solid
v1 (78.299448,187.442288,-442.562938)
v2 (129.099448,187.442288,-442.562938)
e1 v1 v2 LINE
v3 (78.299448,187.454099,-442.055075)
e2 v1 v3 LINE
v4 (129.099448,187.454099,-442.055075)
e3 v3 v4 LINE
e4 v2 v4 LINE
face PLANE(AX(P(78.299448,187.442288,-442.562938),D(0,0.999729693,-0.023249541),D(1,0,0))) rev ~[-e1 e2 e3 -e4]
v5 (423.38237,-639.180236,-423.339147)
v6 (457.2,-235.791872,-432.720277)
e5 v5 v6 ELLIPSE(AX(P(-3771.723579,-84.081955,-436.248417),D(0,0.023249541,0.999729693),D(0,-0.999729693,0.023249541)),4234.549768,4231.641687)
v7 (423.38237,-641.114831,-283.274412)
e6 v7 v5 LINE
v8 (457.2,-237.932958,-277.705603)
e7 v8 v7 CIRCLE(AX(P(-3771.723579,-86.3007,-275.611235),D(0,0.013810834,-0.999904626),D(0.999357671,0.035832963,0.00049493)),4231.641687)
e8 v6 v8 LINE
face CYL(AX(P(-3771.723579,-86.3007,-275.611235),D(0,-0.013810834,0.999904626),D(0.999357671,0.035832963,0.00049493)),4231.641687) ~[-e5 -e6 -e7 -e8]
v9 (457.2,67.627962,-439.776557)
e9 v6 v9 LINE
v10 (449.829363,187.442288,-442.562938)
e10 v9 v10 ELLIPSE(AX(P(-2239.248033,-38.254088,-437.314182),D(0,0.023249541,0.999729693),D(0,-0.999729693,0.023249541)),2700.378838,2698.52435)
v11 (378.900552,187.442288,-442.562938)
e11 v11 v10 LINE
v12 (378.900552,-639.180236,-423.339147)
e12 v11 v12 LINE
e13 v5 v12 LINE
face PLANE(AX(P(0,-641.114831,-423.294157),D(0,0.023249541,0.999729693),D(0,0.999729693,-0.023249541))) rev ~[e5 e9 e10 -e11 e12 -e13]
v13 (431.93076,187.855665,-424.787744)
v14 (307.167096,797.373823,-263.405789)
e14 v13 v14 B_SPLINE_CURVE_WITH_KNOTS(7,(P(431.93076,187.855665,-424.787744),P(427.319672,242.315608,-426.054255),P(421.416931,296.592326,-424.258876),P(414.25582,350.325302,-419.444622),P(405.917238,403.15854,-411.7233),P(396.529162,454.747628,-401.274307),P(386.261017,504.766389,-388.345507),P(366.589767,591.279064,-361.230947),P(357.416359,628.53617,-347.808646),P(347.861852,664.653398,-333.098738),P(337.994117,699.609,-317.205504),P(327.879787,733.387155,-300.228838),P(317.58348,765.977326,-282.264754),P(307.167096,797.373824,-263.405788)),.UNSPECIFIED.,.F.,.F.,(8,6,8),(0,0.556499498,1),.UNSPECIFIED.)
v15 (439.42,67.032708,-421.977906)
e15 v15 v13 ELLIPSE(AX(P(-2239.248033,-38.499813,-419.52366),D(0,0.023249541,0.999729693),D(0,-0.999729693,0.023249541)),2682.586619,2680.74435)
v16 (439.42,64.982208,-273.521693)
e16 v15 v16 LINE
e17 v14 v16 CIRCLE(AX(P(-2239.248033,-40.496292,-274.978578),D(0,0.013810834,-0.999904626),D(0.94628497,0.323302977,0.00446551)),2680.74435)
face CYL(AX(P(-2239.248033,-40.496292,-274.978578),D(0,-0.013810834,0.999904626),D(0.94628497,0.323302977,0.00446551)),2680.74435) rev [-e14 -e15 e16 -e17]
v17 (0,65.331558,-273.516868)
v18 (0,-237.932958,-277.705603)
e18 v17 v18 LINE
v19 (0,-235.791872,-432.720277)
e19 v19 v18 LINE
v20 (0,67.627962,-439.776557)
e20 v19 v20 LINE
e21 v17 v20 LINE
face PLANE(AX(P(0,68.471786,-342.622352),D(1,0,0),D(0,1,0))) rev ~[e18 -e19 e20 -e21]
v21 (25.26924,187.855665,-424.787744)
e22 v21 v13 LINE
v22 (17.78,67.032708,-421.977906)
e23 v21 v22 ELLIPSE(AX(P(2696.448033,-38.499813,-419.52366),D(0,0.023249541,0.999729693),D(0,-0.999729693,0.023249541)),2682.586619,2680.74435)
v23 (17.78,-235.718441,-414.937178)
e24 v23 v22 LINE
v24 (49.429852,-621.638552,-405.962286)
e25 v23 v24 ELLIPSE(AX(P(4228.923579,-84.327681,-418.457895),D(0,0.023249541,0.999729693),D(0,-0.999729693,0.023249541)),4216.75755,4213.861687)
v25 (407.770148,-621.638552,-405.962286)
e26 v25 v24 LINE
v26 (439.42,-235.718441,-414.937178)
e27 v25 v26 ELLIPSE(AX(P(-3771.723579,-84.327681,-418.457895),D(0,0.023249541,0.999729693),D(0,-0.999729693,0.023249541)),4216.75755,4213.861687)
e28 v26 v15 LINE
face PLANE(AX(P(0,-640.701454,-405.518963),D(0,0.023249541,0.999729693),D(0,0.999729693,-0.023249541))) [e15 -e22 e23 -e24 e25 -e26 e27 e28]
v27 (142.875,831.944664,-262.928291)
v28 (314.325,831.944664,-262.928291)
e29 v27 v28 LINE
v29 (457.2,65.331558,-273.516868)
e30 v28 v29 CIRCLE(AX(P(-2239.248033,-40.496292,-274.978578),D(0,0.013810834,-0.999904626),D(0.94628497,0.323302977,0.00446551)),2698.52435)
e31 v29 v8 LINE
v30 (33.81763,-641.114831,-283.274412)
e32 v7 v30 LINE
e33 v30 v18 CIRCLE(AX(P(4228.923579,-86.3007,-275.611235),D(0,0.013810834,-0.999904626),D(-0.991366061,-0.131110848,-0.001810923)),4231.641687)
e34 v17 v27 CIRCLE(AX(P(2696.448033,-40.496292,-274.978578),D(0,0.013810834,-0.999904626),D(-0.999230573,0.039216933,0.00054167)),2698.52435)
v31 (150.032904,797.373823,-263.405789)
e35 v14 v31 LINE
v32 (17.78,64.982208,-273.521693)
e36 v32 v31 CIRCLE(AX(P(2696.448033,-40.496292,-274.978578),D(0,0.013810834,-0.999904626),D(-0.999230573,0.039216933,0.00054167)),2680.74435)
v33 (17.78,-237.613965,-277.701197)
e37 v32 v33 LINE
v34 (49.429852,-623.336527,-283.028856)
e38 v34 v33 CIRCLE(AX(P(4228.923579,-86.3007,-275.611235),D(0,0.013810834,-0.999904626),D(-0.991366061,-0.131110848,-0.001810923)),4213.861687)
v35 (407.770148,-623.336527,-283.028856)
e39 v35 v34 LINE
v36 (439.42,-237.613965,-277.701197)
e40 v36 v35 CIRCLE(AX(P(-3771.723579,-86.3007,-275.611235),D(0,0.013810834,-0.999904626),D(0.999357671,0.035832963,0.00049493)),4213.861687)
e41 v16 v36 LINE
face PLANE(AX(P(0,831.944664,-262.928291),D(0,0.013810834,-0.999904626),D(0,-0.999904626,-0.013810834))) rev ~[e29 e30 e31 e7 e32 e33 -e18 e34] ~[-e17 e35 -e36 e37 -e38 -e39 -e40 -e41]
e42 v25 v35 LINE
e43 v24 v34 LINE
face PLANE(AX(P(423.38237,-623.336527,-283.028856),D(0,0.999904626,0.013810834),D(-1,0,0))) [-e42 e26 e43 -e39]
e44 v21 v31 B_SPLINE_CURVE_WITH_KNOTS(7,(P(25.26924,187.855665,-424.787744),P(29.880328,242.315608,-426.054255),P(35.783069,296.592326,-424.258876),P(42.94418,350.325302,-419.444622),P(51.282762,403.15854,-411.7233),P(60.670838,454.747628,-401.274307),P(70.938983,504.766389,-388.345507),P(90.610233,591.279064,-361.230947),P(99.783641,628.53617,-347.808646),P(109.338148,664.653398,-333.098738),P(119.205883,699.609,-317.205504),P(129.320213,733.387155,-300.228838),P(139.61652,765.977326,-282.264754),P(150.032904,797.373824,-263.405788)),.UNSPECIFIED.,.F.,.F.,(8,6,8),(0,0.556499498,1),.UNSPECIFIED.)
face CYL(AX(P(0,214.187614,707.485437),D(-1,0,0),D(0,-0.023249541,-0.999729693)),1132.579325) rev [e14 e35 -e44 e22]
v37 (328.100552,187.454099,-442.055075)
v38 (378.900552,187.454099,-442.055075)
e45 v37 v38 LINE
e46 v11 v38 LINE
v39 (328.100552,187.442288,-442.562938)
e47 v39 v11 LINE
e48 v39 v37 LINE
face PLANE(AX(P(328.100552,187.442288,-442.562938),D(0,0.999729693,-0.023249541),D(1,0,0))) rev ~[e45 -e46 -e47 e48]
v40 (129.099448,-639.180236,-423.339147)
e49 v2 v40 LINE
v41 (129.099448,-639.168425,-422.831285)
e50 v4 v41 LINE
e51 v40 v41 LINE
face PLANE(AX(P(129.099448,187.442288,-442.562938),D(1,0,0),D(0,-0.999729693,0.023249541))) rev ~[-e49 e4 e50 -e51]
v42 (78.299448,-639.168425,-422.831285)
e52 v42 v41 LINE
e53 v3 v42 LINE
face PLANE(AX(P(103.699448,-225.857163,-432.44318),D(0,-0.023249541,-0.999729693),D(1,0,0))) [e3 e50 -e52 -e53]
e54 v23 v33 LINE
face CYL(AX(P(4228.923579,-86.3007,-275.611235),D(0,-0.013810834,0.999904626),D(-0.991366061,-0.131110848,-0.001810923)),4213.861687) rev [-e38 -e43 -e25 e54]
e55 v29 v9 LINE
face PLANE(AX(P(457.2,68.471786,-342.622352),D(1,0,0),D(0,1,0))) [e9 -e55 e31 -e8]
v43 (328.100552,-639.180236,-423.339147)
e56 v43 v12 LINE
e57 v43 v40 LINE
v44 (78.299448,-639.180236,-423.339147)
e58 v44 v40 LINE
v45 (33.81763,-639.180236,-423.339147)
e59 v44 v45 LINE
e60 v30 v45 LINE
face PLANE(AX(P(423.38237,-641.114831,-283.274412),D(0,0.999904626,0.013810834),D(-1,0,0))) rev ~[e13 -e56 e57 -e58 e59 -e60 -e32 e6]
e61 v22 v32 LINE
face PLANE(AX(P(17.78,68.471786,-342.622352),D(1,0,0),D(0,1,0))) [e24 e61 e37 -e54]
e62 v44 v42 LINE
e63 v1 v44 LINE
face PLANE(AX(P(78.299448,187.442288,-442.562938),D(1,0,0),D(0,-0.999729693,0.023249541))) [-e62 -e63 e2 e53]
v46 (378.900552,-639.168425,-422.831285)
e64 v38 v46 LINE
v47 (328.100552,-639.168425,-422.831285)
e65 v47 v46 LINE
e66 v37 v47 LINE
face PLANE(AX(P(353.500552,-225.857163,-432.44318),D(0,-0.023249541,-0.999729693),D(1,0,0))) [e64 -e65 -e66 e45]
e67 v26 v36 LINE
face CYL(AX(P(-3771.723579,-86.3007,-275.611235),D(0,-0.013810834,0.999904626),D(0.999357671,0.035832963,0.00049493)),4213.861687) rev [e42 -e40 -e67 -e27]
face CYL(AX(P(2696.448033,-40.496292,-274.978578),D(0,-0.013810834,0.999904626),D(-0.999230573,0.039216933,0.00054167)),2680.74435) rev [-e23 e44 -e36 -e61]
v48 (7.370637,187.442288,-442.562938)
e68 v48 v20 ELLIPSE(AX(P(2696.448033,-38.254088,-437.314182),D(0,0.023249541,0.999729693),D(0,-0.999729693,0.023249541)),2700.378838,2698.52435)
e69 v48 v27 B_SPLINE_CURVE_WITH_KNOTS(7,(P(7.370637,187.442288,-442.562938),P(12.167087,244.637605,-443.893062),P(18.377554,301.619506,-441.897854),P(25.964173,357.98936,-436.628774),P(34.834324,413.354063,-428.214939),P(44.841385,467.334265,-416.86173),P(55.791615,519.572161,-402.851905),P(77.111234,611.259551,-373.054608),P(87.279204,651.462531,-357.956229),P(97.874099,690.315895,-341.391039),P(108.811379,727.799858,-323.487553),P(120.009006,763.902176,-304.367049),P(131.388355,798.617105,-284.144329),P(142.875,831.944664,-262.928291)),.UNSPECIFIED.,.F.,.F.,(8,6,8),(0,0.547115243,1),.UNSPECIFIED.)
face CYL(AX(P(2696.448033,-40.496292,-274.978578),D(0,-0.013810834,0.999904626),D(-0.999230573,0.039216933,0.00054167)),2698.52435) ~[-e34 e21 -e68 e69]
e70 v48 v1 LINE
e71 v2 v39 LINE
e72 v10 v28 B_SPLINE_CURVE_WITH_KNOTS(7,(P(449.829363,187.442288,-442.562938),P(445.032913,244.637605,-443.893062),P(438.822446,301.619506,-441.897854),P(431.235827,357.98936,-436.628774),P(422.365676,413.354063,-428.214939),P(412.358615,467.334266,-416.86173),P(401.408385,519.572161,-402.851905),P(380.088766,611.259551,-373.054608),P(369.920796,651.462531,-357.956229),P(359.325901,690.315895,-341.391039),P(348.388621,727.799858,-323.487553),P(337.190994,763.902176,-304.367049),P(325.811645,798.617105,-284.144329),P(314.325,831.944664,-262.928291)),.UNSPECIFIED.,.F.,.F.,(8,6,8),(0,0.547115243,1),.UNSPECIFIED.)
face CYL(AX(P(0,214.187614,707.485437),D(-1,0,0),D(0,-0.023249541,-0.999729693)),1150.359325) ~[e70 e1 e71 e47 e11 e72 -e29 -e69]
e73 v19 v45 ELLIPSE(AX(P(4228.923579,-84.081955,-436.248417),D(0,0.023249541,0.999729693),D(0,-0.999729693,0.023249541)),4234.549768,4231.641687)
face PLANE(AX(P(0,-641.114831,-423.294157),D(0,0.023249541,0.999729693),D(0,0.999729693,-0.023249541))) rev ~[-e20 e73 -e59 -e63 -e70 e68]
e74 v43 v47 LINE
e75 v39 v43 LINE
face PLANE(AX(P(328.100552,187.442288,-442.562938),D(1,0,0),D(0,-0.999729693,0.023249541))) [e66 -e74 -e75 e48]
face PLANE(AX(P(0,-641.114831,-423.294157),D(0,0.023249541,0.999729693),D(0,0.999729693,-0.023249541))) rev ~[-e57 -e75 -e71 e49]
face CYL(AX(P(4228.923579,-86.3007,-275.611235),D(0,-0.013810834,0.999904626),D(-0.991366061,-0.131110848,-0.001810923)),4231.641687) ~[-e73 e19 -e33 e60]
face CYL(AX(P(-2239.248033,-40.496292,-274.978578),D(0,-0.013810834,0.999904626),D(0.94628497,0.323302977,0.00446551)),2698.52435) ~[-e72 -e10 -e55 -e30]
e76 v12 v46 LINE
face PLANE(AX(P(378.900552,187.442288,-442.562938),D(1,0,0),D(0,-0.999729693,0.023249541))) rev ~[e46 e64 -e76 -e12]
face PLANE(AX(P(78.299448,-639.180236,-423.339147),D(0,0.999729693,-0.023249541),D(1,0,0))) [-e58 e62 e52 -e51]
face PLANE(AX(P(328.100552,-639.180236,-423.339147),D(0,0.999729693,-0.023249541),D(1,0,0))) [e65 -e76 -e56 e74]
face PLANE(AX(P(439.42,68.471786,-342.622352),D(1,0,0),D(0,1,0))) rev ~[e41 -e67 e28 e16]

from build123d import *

# Parameters (mm, degrees)
F1_DEPTH = 457.2
F3_DEPTH = 254
F4_T     = 17.78
F5_W     = 50.8
F5_H     = 826.8460257717
F6_DEPTH = 0.508


# Not quite as in the source:
# - a shell that OpenCascade refuses in one call is made with other operations: the cavity is built on its own and cut out


with BuildPart() as f1:
    # F0 (on Right) → F1 (new body)
    with BuildSketch(Plane.YZ):
        with BuildLine():
            Line((288.924485445, -270.4285681248), (-641.1148309708, -283.2744121552))
            Line((-641.1148309708, -283.2744121552), (-641.1148309708, -423.2941567898))
            Line((-641.1148309708, -423.2941567898), (187.4422878027, -442.5629377365))
            ThreePointArc((187.4422878027, -442.5629377365), (523.0417315747, -400.6371692989), (831.9446638759, -262.9282910995))
            Line((831.9446638759, -262.9282910995), (288.924485445, -270.4285681248))
        make_face()
    extrude(amount=F1_DEPTH)

    # F2 (on face) → F3 (cut)
    with BuildSketch(Plane(origin=(0, 3.7895971393, -274.3668944279), x_dir=(1, 0, 0), z_dir=(0, -0.0138108343, 0.9999046259))):
        with BuildLine():
            Line((423.3823697388, -644.965941169), (615.9012913704, -644.965941169))
            Line((615.9012913704, -644.965941169), (483.5176634908, 828.234058831))
            Line((483.5176634908, 828.234058831), (457.2, 61.5478307009))
            ThreePointArc((457.2, 61.5478307009), (455.0788529219, -292.4168742611), (423.3823697388, -644.965941169))
        make_face()
        with BuildLine():
            ThreePointArc((0, 61.5478307009), (43.5944295305, 450.079610673), (142.875, 828.234058831))
            Line((142.875, 828.234058831), (0, 828.234058831))
            Line((0, 828.234058831), (-26.3176634908, 828.234058831))
            Line((-26.3176634908, 828.234058831), (0, 61.5478307009))
        make_face()
        with BuildLine():
            ThreePointArc((33.8176302612, -644.965941169), (2.1211470781, -292.4168742611), (0, 61.5478307009))
            Line((0, 61.5478307009), (-26.3176634908, 828.234058831))
            Line((-26.3176634908, 828.234058831), (-361.6100847721, -644.965941169))
            Line((-361.6100847721, -644.965941169), (33.8176302612, -644.965941169))
        make_face()
        with BuildLine():
            Line((457.2, 61.5478307009), (483.5176634908, 828.234058831))
            Line((483.5176634908, 828.234058831), (457.2, 828.234058831))
            Line((457.2, 828.234058831), (314.325, 828.234058831))
            ThreePointArc((314.325, 828.234058831), (413.6055704695, 450.079610673), (457.2, 61.5478307009))
        make_face()
        Polygon((0, -644.965941169), (-361.6100847721, -644.965941169), (237.2898459435, -852.3167967796), (615.9012913704, -644.965941169), (457.2, -644.965941169), (423.3823697388, -644.965941169), (33.8176302612, -644.965941169), align=None)
    extrude(amount=-F3_DEPTH, mode=Mode.SUBTRACT)

    # F4: shell of thickness 17.78, made by hand


with BuildPart() as f4_core1:
    # F4_t2: copy of F1
    add(f1.part)

    # the walls: a layer under each face that stays
    f4_faces = [f4_core1.faces().sort_by_distance(p)[0] for p in [
        (228.6, 523.0417315747, -400.6371692989),
        (43.5944295305, 455.0197886911, -354.5608330612),
        (413.6055704695, 455.0197886911, -354.5608330612),
        (228.6, -225.8689739056, -432.9510425705),
        (0, -85.1524982143, -356.6467120233),
        (12.0864906617, -438.857755801, -358.0029304556),
        (228.6, -640.1475332924, -353.3067797799),
        (445.1135093383, -438.857755801, -358.0029304556),
        (457.2, -85.1524982143, -356.6467120233),
    ]]
    thicken(f4_faces, amount=-F4_T, mode=Mode.SUBTRACT)


with BuildPart() as f1_1:
    add(f1.part)

    # what is left inside the walls is the cavity
    f4_cavity = [f4_core1.part.solids().sort_by_distance(p)[0] for p in [
        (298.873333, 87.021104, -273.395105),
    ]]
    add(f4_cavity, mode=Mode.SUBTRACT)

    # F5 (on face) → F6 (cut)
    with BuildSketch(Plane(origin=(0, -10.1852834725, -437.9669451445), x_dir=(1, 0, 0), z_dir=(0, -0.0232495407, -0.9997296929))):
        with Locations((103.6994478941, 215.7420070303)):
            Rectangle(F5_W, F5_H)
        with Locations((353.5005521059, 215.7420070303)):
            Rectangle(F5_W, F5_H)
    extrude(amount=-F6_DEPTH, mode=Mode.SUBTRACT)


solid = f1_1.part
